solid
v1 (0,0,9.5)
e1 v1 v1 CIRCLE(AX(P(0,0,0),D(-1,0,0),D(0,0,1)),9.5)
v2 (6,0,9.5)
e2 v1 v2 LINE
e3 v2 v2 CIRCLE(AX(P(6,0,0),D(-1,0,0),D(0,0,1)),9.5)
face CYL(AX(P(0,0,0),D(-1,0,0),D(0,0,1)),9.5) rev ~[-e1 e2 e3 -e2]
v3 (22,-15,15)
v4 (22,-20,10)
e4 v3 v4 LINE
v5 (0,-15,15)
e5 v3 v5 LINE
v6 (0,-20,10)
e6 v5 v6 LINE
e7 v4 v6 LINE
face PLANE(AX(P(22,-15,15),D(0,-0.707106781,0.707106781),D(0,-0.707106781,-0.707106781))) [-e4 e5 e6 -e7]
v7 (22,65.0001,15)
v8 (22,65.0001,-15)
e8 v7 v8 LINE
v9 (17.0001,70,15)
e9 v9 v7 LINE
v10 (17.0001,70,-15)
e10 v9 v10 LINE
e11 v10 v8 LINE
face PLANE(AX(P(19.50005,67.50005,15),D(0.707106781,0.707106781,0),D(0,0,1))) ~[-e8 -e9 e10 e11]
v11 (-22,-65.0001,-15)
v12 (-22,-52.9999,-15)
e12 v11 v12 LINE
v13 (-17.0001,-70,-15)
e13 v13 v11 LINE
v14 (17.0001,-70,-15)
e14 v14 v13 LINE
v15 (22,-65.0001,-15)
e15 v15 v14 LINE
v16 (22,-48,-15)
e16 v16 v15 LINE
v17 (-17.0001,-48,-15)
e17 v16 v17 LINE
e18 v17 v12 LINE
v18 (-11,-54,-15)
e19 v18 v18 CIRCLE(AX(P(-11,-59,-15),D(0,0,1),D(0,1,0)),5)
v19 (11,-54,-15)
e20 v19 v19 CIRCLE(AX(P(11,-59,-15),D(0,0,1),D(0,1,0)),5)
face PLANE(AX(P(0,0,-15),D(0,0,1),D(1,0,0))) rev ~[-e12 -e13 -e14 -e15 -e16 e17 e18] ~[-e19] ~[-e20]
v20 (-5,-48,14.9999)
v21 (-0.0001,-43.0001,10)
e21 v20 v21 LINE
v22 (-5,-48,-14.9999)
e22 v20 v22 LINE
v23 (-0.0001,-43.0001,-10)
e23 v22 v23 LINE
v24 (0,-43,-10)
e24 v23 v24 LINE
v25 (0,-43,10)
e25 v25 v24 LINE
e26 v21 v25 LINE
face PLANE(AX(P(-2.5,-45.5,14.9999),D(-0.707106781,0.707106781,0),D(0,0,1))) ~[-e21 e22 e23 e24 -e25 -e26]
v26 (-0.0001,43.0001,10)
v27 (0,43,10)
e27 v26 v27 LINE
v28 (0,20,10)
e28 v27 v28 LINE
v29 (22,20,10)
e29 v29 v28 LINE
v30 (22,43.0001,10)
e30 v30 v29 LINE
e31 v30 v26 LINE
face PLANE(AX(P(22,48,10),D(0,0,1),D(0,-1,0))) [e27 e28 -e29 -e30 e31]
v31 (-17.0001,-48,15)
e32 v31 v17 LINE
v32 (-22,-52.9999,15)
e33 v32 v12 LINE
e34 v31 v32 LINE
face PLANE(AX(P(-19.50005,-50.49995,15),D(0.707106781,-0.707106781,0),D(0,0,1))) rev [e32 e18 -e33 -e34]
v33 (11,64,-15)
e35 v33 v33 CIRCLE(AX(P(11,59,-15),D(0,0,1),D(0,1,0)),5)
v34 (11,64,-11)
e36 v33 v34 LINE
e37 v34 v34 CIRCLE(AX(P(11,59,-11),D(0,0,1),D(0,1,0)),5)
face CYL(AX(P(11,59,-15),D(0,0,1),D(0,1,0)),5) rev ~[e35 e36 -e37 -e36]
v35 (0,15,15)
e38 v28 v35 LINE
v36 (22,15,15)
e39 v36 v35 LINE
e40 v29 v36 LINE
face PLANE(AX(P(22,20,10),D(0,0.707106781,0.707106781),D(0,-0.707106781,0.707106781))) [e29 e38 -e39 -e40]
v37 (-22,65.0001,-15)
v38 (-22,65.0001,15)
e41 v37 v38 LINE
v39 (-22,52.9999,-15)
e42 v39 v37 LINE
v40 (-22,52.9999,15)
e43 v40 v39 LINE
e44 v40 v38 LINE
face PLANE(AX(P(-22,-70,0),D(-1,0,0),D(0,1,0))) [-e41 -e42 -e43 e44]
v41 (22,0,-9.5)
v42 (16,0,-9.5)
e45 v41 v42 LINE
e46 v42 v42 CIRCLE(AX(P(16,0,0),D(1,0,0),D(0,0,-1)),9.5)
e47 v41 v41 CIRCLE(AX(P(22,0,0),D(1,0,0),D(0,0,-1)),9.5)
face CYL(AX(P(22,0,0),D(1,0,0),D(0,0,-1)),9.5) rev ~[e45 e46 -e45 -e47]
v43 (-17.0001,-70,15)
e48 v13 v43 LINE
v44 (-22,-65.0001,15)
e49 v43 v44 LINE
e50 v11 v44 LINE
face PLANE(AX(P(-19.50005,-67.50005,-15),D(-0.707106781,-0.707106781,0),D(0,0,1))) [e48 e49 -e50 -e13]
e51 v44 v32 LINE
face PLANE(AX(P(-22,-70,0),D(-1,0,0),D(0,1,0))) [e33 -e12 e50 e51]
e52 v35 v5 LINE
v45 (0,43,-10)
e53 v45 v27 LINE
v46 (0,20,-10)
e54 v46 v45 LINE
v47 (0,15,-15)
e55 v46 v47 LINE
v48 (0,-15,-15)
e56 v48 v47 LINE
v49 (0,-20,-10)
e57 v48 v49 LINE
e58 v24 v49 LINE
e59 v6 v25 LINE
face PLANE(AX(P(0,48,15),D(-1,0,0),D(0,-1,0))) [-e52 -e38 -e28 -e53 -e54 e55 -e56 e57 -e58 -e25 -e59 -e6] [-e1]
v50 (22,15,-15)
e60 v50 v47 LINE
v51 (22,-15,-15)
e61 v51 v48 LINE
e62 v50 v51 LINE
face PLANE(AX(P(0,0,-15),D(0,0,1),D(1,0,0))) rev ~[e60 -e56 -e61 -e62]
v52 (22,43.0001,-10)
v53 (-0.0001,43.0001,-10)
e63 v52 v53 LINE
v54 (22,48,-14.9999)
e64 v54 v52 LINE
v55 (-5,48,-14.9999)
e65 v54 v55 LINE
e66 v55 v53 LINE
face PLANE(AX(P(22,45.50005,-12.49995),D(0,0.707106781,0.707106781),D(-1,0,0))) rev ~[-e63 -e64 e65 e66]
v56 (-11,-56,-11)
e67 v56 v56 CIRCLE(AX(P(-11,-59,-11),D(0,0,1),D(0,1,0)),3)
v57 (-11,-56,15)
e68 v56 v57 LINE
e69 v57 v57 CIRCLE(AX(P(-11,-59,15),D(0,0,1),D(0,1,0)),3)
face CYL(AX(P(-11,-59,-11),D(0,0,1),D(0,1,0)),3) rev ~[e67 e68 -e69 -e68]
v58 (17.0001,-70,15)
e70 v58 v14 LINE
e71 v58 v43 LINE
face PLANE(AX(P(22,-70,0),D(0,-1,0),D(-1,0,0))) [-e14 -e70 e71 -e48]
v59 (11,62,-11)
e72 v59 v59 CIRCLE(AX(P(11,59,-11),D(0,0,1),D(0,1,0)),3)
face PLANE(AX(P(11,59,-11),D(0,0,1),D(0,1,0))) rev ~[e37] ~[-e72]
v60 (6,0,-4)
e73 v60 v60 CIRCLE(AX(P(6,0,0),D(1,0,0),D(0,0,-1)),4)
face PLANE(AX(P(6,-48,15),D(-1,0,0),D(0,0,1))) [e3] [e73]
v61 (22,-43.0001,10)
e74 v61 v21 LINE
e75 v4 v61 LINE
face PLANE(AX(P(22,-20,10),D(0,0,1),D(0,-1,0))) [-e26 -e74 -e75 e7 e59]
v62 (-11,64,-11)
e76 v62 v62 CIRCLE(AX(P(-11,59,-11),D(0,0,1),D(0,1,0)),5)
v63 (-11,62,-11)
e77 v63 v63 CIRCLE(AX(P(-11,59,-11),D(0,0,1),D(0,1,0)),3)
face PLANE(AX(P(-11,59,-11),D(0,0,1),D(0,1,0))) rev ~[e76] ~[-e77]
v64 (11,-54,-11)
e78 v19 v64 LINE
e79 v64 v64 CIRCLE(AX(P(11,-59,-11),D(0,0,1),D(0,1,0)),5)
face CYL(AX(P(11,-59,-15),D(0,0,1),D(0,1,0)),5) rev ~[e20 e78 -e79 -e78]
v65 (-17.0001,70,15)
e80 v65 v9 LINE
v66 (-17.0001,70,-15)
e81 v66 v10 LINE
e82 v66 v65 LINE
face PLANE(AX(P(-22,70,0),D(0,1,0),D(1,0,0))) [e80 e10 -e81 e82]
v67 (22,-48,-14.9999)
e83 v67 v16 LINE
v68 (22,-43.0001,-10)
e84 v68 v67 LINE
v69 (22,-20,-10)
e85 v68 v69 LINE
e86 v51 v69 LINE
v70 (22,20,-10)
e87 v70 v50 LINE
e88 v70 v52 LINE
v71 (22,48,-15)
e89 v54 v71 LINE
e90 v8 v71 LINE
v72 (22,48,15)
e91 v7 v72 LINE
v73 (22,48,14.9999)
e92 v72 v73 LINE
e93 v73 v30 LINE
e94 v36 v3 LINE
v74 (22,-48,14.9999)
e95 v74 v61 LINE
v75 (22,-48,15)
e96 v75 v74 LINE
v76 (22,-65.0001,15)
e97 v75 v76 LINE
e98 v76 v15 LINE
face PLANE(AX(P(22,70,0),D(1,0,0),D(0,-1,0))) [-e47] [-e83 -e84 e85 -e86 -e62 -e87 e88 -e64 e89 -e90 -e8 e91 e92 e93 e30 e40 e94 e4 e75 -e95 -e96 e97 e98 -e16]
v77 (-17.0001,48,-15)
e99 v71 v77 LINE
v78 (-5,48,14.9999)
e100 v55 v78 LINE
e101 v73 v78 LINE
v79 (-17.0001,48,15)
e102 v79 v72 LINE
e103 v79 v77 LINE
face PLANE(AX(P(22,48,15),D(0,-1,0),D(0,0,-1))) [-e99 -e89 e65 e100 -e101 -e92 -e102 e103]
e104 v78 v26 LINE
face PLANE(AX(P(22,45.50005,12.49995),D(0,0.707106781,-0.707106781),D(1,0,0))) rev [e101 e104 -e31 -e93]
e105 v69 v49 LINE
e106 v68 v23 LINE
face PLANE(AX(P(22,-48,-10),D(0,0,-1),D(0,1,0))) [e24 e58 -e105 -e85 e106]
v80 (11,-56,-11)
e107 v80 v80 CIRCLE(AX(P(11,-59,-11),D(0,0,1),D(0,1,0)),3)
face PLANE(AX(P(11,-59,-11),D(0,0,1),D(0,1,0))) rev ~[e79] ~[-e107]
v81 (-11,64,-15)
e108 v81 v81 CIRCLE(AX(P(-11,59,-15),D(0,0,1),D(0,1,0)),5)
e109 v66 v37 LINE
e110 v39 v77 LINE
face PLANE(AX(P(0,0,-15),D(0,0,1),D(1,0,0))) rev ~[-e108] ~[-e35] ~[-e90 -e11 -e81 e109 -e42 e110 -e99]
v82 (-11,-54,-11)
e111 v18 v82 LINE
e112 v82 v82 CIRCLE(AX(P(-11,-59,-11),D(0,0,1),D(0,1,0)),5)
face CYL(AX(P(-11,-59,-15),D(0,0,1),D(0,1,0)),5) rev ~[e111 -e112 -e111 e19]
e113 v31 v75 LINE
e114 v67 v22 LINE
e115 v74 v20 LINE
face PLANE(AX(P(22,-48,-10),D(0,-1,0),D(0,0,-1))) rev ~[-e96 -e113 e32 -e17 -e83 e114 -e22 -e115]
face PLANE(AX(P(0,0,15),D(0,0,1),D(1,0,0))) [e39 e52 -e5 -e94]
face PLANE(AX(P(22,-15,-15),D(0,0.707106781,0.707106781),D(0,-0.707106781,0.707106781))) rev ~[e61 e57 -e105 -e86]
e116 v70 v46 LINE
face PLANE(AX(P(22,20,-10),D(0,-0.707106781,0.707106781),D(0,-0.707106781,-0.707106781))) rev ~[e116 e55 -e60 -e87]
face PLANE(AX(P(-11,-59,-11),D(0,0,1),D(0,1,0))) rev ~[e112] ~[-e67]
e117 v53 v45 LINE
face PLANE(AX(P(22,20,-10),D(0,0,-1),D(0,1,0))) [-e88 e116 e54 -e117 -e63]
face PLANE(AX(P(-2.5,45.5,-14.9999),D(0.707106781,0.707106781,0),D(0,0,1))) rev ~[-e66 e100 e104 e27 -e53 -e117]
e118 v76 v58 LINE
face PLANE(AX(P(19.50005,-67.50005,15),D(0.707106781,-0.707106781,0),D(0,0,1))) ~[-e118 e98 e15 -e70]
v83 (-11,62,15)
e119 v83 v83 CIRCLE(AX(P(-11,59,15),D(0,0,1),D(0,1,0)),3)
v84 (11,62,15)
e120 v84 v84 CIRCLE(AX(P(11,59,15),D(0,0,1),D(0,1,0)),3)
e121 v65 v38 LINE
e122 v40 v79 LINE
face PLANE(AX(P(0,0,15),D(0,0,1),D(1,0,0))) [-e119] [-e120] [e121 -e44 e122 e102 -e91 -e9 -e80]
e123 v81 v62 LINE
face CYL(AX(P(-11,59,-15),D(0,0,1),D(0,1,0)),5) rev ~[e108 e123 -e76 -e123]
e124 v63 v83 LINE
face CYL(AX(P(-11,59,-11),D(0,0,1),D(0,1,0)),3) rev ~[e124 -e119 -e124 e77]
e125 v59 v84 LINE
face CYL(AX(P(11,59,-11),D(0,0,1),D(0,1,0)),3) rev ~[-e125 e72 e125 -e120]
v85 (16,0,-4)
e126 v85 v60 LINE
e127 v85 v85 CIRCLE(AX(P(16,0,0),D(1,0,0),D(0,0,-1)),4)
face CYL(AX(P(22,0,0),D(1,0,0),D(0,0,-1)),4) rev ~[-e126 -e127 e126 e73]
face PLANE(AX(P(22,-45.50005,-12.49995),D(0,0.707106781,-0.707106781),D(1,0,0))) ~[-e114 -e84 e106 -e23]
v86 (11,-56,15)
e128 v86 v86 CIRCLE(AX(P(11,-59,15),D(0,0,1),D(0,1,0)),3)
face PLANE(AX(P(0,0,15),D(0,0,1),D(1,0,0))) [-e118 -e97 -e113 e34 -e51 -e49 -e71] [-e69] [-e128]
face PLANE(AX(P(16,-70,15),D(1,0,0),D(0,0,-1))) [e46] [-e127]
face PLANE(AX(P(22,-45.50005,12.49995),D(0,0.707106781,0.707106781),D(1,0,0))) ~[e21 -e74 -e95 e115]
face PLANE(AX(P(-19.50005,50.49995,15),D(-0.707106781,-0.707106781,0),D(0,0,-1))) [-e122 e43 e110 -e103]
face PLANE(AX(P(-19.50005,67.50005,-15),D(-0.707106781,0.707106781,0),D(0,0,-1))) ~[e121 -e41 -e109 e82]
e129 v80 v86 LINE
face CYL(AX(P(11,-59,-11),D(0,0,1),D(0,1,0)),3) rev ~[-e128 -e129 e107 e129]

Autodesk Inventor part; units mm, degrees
ref_plane "YZ Plane" through (0, 0, 0) normal (1, 0, 0) x (0, 1, 0)
ref_plane "XZ Plane" through (0, 0, 0) normal (0, 1, 0) x (-1, 0, 0)
ref_plane "XY Plane" through (0, 0, 0) normal (0, 0, 1) x (1, 0, 0)
sketch "Esquisse17" plane through (0, 0, 0) normal (0, 0, 1) x (1, 0, 0)
  line L0 (-22, 70) -> (22, 70)
  line L1 (22, 70) -> (22, -70)
  line L2 (22, -70) -> (-22, -70)
  line L3 (-22, -70) -> (-22, 70)
  point P0 (0, 0)
  dimension "d107" = 70
  dimension "d108" = 140
  dimension "d109" = 44
  dimension "d110" = 22
extrude "Extrusion13" add sketch "Esquisse17" along normal mid plane 30
sketch "Esquisse18" plane through (22, -70, 15) normal (1, 0, 0) x (0, 0, -1)
  circle A0 centre (15, 70) radius 4
  dimension "d113" = 8
extrude "Extrusion14" cut sketch "Esquisse18" against normal up to next
sketch "Esquisse19" plane through (22, -70, 15) normal (1, 0, 0) x (0, 0, -1)
  circle A0 centre (15, 70) radius 9.5
  dimension "d116" = 19
extrude "Extrusion15" cut sketch "Esquisse19" against normal blind 6
sketch "Esquisse20" plane through (0, 0, 15) normal (0, 0, 1) x (1, 0, 0)
  line L0 (-22, 48) -> (0, 48)
  line L1 (0, 48) -> (0, -48)
  line L2 (0, -48) -> (-22, -48)
  line L3 (-22, -48) -> (-22, 48)
  line L4 (22, -70) -> (22, 70) projected
  line L5 (-22, 70) -> (-22, -70) projected
  point P0 (0, 0)
  dimension "d119" = 96
  dimension "d120" = 48
  dimension "d121" = 22
extrude "Extrusion16" cut sketch "Esquisse20" against normal up to next
sketch "Esquisse21" plane through (0, -48, 15) normal (-1, 0, 0) x (0, 0, 1)
  circle A0 centre (-15, 48) radius 9.5
  dimension "d125" = 19
extrude "Extrusion17" cut sketch "Esquisse21" against normal blind 6
sketch "Esquisse22" plane through (22, -70, 15) normal (1, 0, 0) x (0, 0, -1)
  line L0 (5, 0) -> (25, 0)
  line L1 (25, 140) -> (5, 140)
  line L2 (0, 0) -> (30, 0) projected
  line L3 (0, 140) -> (30, 140) projected
  line L4 (0, 0) -> (0, 140) projected
  line L5 (30, 140) -> (30, 0) projected
  line L6 (30, 55) -> (30, 85)
  line L7 (0, 85) -> (0, 55)
  line L8 (0, 55) -> (0, 55)
  line L9 (30, 55) -> (30, 55)
  line L10 (5, 140) -> (5, 90)
  line L11 (5, 50) -> (5, 0)
  line L12 (25, 0) -> (25, 50)
  line L13 (25, 90) -> (25, 140)
  line L14 (30, 85) -> (30, 85)
  line L15 (0, 85) -> (0, 85)
  line L16 (0, 55) -> (5, 50)
  line L17 (5, 90) -> (0, 85)
  line L18 (25, 90) -> (30, 85)
  line L19 (30, 55) -> (25, 50)
  line L20 (0, 118) -> (5, 118)
  line L21 (25, 118) -> (30, 118)
  line L22 (0, 22) -> (5, 22)
  line L23 (25, 22) -> (30, 22)
  point P0 (15, 70)
  point P1 (5, 55)
  point P2 (25, 55)
  point P3 (5, 85)
  point P4 (25, 85)
  dimension "d131" = 30
  dimension "d133" = 20
  dimension "d134" = 10
  dimension "d135" = 30
  dimension "d136" = 15
  dimension "d137" = 5
  dimension "d138" = 5
  dimension "d139" = 5
  dimension "d140" = 5
  dimension "d141" = 5
  dimension "d142" = 5
  dimension "d143" = 5
  dimension "d144" = 5
extrude "Extrusion19" cut sketch "Esquisse22" against normal up to next contours L22 L4 L16 L11 | L12 L19 L5 L23 | L4 L20 L10 L17 | L18 L13 L21 L5
chamfer "Chanfrein3" distance 5 angle 45 10 edges at (11, -48, -10) (11, -48, 10) (11, 48, 10) (11, 48, -10) (-22, -48, 0) (-22, -70, 0) (-22, 48, 0) (-22, 70, 0) (22, -70, 0) (22, 70, 0)
sketch "Esquisse23" plane through (0, 0, -15) normal (0, 0, -1) x (-1, 0, 0)
  line L0 (-11, -59) -> (11, -59)
  line L1 (17, -48) -> (0, -48) projected
  line L2 (0, -48) -> (-22, -48) projected
  line L3 (-22, -48) -> (-22, -65) projected
  line L4 (-17, -70) -> (17, -70) projected
  line L5 (22, -65) -> (22, -53) projected
  line L6 (-46.7579, 0) -> (65.4048, 0)
  line L7 (-11, 59) -> (11, 59)
  line L8 (20, 48) -> (0, 48)
  line L9 (0, 48) -> (-22, 48)
  line L10 (-22, 48) -> (-22, 70)
  line L11 (-22, 70) -> (20, 70)
  line L12 (20, 70) -> (20, 48)
  line L13 (0, 15) -> (-22, 15) projected
  line L14 (-22, 15) -> (-22, -15) projected
  line L15 (-22, -15) -> (0, -15) projected
  line L16 (0, -15) -> (0, 15) projected
  line L17 (-17, -70) -> (-22, -65) projected
  line L18 (22, -65) -> (17, -70) projected
  line L19 (17, -48) -> (22, -53) projected
  line L20 (-22, 65) -> (-17, 70) projected
  line L21 (-22, 48) -> (0, 48) projected
  line L22 (0, 48) -> (17, 48) projected
  line L23 (22, 53) -> (17, 48) projected
  line L24 (22, 53) -> (22, 65) projected
  line L25 (17, 70) -> (22, 65) projected
  line L26 (17, 70) -> (-17, 70) projected
  line L27 (-22, 65) -> (-22, 48) projected
  point P0 (0, 0)
  dimension "d153" = 11
  dimension "d154" = 11
  dimension "d155" = 11
hole "Perçage4" at (11, -59, -15) at (-11, -59, -15) at (11, 59, -15) at (-11, 59, -15) direction (0, 0, 1) diameter 6 end through all counterbore diameter 10 counterbore depth 4
chamfer "Chanfrein4" distance 5 angle 45 2 edges at (0, 48, 0) (0, -48, 0)
equation "\"d107\" = 0.5 * d108"
equation "\"d110\" = 0.5 * d109"
equation "\"d120\" = 0.5 * d119"
equation "\"d134\" = 0.5 * d133"
equation "\"d135\" = d131"
equation "\"d136\" = 0.5 * d135"
equation "\"d138\" = d137"
equation "\"d139\" = d137"
equation "\"d140\" = d139"
equation "\"d141\" = d137"
equation "\"d142\" = d141"
equation "\"d143\" = d137"
equation "\"d144\" = d143"
equation "\"d153\" = 0.5 * d152"
equation "\"d154\" = d153"
equation "\"d155\" = d153"
equation "\"d132\" = 0.5 * d130"
equation "\"d152\" = 22"
equation "\"d130\" = 30"
properties part number "Wheel_Block"
